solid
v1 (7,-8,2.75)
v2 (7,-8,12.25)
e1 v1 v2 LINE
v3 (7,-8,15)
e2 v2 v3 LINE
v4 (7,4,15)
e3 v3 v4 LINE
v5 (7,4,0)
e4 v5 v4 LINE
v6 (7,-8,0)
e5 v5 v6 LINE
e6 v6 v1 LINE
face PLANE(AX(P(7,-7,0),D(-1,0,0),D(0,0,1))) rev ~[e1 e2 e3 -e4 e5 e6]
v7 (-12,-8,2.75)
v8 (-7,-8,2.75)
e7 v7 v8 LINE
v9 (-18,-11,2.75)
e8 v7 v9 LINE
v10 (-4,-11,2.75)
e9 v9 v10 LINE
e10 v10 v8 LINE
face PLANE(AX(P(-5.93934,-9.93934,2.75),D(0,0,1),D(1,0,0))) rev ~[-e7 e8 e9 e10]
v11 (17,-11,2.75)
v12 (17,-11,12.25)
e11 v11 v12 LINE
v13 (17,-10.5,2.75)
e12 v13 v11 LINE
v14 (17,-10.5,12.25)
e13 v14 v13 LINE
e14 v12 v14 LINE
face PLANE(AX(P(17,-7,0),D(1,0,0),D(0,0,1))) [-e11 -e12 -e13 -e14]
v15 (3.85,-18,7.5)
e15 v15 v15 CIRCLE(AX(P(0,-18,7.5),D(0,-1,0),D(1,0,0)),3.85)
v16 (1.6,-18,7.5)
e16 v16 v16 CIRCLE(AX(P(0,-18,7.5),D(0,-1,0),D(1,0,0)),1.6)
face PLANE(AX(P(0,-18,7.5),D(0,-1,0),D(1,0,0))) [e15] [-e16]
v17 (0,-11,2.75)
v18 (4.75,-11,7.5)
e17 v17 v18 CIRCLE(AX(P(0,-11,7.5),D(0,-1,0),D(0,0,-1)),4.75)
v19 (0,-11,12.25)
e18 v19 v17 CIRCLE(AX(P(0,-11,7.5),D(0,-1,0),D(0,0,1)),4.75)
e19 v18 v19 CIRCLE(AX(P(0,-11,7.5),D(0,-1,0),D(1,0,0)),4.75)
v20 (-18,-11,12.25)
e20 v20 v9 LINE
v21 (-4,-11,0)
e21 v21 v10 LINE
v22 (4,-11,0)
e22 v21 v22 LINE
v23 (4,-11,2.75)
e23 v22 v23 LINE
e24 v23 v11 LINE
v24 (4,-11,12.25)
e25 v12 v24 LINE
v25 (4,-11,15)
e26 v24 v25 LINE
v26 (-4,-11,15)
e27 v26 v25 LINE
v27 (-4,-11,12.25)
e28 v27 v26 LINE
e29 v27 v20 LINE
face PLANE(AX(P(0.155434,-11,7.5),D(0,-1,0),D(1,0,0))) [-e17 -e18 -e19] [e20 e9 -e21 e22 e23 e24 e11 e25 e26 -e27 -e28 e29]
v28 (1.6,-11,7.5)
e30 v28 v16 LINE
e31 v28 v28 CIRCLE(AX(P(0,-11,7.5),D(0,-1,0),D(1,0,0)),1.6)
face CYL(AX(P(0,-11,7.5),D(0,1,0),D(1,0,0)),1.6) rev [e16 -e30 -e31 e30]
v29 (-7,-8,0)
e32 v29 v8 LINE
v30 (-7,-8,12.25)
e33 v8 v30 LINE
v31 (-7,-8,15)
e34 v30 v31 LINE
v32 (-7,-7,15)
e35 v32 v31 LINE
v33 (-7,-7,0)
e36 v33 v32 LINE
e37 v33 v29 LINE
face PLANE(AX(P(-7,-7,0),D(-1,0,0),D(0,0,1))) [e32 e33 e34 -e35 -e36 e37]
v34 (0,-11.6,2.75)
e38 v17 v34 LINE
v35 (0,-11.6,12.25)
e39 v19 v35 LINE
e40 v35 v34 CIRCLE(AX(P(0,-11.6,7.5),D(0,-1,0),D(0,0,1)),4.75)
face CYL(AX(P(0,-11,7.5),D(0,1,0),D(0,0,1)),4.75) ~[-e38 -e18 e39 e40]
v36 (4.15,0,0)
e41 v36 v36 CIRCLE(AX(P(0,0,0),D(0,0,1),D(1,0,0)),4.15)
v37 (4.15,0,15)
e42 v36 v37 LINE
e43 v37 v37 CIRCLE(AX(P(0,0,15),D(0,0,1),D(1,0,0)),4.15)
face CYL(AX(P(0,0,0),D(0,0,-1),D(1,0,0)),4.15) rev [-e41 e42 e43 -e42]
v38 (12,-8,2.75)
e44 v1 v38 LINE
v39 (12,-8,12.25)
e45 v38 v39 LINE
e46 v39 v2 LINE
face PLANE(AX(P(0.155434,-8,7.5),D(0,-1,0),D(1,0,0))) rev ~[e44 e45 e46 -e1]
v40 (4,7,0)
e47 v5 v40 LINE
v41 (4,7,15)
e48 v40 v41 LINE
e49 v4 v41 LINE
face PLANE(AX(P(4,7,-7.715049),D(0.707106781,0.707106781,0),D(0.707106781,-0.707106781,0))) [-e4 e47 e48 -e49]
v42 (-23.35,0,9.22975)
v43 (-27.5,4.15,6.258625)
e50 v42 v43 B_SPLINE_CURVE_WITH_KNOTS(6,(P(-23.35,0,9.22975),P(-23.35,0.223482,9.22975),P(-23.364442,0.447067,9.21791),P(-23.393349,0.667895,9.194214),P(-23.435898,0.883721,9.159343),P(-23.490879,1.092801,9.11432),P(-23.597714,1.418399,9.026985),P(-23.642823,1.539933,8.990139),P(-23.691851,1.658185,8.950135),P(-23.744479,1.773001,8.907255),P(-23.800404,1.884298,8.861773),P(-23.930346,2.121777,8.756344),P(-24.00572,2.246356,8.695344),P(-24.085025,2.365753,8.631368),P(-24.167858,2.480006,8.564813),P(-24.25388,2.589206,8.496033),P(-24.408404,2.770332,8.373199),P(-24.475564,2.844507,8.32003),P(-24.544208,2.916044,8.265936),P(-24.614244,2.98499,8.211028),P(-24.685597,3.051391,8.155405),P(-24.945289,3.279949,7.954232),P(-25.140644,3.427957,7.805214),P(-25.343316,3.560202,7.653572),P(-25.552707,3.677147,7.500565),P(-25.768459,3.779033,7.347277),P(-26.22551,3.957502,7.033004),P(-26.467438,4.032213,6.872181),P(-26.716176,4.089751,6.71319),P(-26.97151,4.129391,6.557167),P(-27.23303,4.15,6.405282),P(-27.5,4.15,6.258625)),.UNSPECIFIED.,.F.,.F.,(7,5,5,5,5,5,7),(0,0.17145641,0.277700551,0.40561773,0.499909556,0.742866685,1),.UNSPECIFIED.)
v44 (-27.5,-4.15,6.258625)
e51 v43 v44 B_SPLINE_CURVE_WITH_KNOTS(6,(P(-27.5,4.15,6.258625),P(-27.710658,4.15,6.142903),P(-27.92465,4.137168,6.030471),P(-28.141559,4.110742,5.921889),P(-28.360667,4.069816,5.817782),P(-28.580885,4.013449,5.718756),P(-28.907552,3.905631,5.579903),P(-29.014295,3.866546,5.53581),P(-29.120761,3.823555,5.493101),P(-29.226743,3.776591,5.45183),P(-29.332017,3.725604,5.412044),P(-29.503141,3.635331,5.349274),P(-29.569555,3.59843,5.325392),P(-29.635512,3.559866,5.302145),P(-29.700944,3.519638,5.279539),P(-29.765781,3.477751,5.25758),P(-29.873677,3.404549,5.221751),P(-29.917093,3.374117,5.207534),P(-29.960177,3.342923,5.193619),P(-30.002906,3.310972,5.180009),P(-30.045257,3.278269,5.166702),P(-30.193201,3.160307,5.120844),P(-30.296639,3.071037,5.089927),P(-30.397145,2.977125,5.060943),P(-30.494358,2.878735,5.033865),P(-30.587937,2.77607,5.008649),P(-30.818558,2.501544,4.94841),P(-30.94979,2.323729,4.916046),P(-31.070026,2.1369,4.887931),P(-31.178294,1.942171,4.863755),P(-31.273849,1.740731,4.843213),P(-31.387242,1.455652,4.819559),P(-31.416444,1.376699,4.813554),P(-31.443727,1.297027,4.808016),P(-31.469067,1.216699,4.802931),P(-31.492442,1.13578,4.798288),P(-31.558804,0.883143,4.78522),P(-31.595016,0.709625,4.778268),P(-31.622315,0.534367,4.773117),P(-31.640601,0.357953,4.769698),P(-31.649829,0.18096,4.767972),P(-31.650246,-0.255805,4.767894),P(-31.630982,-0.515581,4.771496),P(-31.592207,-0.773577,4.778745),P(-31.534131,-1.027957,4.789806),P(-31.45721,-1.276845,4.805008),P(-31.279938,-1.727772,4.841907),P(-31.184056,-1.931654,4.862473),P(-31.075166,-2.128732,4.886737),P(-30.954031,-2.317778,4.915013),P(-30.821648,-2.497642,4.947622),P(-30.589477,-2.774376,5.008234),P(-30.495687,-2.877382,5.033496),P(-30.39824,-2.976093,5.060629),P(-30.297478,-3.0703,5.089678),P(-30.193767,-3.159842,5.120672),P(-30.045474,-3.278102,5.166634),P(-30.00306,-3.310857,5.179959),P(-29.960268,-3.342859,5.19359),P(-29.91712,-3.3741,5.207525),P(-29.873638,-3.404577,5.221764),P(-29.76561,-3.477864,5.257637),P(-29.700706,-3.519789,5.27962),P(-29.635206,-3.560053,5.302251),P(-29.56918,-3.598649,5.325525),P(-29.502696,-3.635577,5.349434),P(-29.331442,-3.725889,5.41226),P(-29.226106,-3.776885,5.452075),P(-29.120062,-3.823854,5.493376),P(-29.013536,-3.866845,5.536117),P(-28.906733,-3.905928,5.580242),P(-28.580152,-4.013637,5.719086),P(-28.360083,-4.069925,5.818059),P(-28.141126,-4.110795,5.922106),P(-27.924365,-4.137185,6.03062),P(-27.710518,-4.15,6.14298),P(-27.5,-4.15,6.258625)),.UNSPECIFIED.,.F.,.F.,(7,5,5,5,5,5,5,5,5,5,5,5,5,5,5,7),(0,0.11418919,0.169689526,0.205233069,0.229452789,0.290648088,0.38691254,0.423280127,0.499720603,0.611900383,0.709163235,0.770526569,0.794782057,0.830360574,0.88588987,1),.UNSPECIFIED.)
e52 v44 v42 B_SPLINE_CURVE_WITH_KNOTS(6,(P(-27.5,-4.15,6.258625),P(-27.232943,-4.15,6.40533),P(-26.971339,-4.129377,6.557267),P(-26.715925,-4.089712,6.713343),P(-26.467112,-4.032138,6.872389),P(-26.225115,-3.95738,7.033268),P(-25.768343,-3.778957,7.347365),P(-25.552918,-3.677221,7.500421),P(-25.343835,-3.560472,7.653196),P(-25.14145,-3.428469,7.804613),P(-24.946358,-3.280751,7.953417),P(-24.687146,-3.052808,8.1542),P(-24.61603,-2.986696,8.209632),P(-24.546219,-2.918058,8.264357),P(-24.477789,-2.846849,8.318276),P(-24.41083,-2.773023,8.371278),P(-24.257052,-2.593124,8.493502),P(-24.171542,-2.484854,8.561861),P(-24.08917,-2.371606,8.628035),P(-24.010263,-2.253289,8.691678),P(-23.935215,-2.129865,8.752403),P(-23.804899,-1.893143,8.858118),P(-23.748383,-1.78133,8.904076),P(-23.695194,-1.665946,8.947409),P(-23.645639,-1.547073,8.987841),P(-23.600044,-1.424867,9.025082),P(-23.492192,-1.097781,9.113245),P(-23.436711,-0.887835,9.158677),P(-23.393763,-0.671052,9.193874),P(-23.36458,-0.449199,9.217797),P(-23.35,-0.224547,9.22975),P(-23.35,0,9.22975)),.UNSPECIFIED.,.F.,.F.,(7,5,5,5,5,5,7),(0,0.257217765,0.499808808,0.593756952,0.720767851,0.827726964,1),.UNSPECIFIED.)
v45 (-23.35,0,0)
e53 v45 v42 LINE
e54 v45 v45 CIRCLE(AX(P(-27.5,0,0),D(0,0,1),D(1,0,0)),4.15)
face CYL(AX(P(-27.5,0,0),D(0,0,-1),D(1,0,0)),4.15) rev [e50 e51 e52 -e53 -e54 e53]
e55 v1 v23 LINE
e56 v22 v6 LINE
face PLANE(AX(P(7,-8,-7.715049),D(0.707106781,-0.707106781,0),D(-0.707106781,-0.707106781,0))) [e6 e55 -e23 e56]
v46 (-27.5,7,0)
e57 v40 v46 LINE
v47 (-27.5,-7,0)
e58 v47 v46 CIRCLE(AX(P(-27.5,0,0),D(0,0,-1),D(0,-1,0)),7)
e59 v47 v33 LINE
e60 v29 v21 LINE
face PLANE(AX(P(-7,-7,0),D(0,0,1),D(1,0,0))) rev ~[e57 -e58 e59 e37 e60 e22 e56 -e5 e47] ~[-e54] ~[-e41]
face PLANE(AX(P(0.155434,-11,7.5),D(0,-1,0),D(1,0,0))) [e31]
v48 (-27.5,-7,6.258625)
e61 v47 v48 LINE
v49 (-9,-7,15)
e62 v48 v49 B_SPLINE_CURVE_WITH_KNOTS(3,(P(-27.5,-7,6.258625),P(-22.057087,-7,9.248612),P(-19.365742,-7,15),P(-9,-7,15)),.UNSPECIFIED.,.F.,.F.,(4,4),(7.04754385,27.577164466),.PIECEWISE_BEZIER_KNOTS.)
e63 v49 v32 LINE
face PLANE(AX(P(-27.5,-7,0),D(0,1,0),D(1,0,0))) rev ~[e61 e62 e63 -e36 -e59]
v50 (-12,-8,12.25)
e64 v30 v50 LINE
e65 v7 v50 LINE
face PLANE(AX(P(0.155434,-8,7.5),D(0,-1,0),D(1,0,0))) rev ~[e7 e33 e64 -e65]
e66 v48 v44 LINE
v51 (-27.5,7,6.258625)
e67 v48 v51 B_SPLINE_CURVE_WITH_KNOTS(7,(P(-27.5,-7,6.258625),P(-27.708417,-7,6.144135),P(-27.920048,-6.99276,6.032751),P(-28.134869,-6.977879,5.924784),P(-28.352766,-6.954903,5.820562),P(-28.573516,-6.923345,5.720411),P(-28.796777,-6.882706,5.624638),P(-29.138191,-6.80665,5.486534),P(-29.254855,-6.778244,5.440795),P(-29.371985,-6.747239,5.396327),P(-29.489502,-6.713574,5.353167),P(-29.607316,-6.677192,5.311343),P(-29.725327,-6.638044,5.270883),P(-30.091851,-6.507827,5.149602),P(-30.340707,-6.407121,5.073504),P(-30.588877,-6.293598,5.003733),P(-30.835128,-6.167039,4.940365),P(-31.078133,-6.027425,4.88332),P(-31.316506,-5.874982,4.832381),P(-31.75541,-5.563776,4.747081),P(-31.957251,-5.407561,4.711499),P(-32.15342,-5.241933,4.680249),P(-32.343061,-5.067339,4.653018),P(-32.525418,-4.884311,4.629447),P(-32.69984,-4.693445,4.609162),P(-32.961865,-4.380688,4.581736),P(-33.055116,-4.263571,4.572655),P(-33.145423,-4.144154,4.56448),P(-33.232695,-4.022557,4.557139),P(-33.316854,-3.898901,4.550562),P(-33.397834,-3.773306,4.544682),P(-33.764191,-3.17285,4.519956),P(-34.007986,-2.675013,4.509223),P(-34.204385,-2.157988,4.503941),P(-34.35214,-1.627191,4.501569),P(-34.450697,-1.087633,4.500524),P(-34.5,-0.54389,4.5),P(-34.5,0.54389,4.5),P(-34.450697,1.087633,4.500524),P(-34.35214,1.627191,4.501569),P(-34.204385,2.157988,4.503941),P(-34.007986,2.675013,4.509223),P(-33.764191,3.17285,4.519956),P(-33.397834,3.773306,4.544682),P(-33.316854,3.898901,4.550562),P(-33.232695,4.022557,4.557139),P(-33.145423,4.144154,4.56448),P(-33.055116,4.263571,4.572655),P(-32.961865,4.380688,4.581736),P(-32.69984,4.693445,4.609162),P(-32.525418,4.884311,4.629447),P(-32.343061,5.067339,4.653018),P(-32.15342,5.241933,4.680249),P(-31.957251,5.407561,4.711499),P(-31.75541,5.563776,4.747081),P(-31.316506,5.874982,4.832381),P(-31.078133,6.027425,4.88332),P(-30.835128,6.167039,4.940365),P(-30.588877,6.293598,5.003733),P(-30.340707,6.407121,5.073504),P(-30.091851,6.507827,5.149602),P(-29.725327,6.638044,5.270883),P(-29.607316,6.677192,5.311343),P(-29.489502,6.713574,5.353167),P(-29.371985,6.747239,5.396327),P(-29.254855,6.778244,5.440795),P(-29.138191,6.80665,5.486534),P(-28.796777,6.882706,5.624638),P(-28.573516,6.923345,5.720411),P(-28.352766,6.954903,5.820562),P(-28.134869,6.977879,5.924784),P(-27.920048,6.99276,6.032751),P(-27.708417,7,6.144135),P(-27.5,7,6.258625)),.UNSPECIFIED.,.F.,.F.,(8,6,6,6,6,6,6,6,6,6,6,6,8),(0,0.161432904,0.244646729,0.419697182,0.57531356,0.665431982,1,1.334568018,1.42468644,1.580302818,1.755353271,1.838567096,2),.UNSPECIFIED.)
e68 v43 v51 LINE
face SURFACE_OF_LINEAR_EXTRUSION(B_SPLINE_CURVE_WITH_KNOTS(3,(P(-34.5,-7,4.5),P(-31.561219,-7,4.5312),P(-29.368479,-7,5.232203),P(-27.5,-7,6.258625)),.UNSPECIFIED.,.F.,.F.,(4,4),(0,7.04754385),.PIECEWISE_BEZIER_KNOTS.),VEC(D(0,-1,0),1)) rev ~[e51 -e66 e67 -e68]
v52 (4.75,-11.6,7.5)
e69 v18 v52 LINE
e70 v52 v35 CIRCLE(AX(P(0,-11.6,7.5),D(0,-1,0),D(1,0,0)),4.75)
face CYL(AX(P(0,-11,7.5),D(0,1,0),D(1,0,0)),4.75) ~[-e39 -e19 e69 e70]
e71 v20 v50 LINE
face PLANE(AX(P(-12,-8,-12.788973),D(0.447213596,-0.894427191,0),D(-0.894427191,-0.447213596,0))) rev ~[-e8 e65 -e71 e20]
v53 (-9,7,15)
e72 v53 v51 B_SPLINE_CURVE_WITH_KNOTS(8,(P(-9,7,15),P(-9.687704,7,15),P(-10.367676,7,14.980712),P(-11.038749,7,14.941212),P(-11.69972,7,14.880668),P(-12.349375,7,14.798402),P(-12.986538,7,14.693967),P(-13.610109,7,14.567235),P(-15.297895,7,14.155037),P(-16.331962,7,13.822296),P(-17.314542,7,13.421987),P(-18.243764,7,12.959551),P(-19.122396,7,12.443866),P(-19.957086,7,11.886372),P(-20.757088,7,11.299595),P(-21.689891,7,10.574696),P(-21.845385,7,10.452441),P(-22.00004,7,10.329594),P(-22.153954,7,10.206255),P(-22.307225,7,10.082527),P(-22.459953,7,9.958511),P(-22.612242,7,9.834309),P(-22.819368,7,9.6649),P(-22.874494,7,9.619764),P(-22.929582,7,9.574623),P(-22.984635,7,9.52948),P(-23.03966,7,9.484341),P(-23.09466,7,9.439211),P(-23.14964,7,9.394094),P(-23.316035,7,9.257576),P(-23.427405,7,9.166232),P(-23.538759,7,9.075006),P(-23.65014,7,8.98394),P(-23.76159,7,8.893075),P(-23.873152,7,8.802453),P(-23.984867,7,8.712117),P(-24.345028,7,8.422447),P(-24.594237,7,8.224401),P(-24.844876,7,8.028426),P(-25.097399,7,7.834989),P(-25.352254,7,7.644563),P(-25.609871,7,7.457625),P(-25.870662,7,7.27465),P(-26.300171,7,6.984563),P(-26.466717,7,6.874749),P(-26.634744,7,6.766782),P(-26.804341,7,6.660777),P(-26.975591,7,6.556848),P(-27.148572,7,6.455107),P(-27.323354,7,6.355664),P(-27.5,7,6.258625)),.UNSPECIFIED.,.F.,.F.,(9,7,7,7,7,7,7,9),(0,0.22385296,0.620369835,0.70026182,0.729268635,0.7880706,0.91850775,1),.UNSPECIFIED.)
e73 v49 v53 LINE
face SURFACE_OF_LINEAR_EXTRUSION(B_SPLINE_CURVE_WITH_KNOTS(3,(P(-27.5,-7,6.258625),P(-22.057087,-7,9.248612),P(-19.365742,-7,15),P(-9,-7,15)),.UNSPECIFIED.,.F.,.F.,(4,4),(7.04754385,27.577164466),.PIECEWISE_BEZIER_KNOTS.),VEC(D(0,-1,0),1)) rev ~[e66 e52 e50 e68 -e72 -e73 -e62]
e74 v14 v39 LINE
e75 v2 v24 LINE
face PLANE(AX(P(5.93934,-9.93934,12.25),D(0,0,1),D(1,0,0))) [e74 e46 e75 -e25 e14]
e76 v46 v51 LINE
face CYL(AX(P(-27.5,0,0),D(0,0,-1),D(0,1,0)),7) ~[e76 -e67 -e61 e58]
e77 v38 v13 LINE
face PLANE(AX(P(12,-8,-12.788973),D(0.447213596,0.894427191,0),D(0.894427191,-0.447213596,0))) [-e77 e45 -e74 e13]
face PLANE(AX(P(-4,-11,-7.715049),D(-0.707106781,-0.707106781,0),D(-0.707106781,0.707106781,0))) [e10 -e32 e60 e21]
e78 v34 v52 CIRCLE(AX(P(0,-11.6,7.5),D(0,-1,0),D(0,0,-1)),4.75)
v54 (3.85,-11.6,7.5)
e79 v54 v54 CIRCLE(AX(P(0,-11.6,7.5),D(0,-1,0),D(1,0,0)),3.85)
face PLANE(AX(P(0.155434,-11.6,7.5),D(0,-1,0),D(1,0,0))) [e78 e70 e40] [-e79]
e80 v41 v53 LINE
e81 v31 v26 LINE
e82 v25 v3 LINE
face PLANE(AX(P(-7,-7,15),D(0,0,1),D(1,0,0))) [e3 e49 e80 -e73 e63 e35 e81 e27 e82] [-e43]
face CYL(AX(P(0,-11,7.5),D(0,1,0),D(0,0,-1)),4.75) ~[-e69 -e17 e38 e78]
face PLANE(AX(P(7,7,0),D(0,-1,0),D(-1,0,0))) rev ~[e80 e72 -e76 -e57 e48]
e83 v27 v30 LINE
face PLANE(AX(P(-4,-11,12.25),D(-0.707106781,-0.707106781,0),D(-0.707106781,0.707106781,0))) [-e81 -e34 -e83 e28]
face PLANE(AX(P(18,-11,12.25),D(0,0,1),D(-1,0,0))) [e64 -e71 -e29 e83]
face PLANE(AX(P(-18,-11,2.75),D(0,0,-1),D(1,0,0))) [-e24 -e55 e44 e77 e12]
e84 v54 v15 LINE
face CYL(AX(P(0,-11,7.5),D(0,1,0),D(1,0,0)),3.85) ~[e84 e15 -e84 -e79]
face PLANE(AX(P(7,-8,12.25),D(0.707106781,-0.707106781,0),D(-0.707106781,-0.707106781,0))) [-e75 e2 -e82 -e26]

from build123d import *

# Parameters (mm, degrees)
F0_R         = 4.15
F1_DEPTH     = 15
F2_W         = 14
F2_H         = 15
F3_DEPTH     = 4
F4_R         = 3.85
F5_DEPTH     = 3
F6_T1_DEPTH  = 40.5779464854
F4_R_2       = 1.6
F7_DEPTH     = 7
F8_DEPTH     = 0.6
F10_DEPTH    = 25
F11_T1_DEPTH = 30.4300979278
F11_T3_DEPTH = 10.4650489639
F11_T5_DEPTH = 10.4650489639


# Not quite as in the source:
# - a fillet or chamfer that OpenCascade refuses, or shapes differently, is made with other operations: its cross-section is extruded or revolved along the edge and cut away or added


with BuildPart() as f1:
    # F0 (on Top) → F1 (new body)
    with BuildSketch(Plane.XY):
        with BuildLine():
            Line((7, 7), (-27.5, 7))
            ThreePointArc((-27.5, 7), (-34.5, 0), (-27.5, -7))
            Line((-27.5, -7), (7, -7))
            Line((7, -7), (7, 7))
        make_face()
        with Locations((-27.5, 0)):
            Circle(F0_R, mode=Mode.SUBTRACT)
        Circle(F0_R, mode=Mode.SUBTRACT)
    extrude(amount=F1_DEPTH)

    # F2 (on face) → F3 (join)
    with BuildSketch(Plane.XZ.offset(7)):
        with Locations((0, 7.5)):
            Rectangle(F2_W, F2_H)
    extrude(amount=F3_DEPTH)

    # F4 (on face) → F5 (join)
    with BuildSketch(Plane.XZ.offset(11)):
        with BuildLine():
            ThreePointArc((0, 2.75), (3.3587572106, 4.1412427894), (4.75, 7.5))
            ThreePointArc((4.75, 7.5), (3.3587572106, 10.8587572106), (0, 12.25))
            ThreePointArc((0, 12.25), (-4.75, 7.5), (0, 2.75))
        make_face()
        with Locations((0, 7.5)):
            Circle(F4_R, mode=Mode.SUBTRACT)
        with BuildLine():
            ThreePointArc((0, 12.25), (3.3587572106, 10.8587572106), (4.75, 7.5))
            ThreePointArc((4.75, 7.5), (3.3587572106, 4.1412427894), (0, 2.75))
            Line((0, 2.75), (18, 2.75))
            Line((18, 2.75), (18, 12.25))
            Line((18, 12.25), (0, 12.25))
        make_face()
        with BuildLine():
            ThreePointArc((0, 2.75), (-4.75, 7.5), (0, 12.25))
            Line((0, 12.25), (-18, 12.25))
            Line((-18, 12.25), (-18, 2.75))
            Line((-18, 2.75), (0, 2.75))
        make_face()
    extrude(amount=-F5_DEPTH)

    # F6: chamfer of 3 x 6 on 2 edges, made by hand

    # F6_s2 → F6_t1 (cut)
    with BuildSketch(Plane.XY.offset(-12.7889732427)):
        Polygon((-12, -8), (-18, -11), (-18, -8), align=None)
        Polygon((12, -8), (18, -11), (18, -8), align=None)
    extrude(amount=F6_T1_DEPTH, mode=Mode.SUBTRACT)

    # F4 (on face) → F7 (join)
    with BuildSketch(Plane.XZ.offset(11)):
        with Locations((0, 7.5)):
            Circle(F4_R)
        with Locations((0, 7.5)):
            Circle(F4_R_2, mode=Mode.SUBTRACT)
    extrude(amount=F7_DEPTH)

    # F4 (on face) → F8 (join)
    with BuildSketch(Plane.XZ.offset(11)):
        with BuildLine():
            ThreePointArc((0, 2.75), (3.3587572106, 4.1412427894), (4.75, 7.5))
            ThreePointArc((4.75, 7.5), (3.3587572106, 10.8587572106), (0, 12.25))
            ThreePointArc((0, 12.25), (-4.75, 7.5), (0, 2.75))
        make_face()
        with Locations((0, 7.5)):
            Circle(F4_R, mode=Mode.SUBTRACT)
    extrude(amount=F8_DEPTH)

    # F9 (on face) → F10 (intersect, symmetric)
    with BuildSketch(Plane.XZ.offset(7)):
        with BuildLine():
            Line((-27.5, 6.2586253838), (-27.5, 0))
            Line((-27.5, 0), (-7, 0))
            Line((-7, 0), (-7, 15))
            Line((-7, 15), (-9, 15))
            add(Edge.make_bspline(
                [(-27.5, 6.2586253838), (-22.0570868036, 9.2486118384), (-19.3657420182, 15), (-9, 15)],
                knots=[7.0475438496, 7.0475438496, 7.0475438496, 7.0475438496, 27.5771644663, 27.5771644663, 27.5771644663, 27.5771644663], degree=3))
        make_face()
        with BuildLine():
            Line((-34.5, 4.5), (-34.5, 0))
            Line((-34.5, 0), (-27.5, 0))
            Line((-27.5, 0), (-27.5, 6.2586253838))
            add(Edge.make_bspline(
                [(-34.5, 4.5), (-31.5612189253, 4.5312000669), (-29.3684792153, 5.2322030722), (-27.5, 6.2586253838)],
                knots=[0, 0, 0, 0, 7.0475438496, 7.0475438496, 7.0475438496, 7.0475438496], degree=3))
        make_face()
        Polygon((-7, 15), (-7, 0), (0, 0), (17, 0), (17, 15), align=None)
    extrude(amount=F10_DEPTH, both=True, mode=Mode.INTERSECT)

    # F11: chamfer of 3 on 6 edges, made by hand

    # F11_s2 → F11_t1 (cut)
    with BuildSketch(Plane.XY.offset(-7.7150489639)):
        Polygon((4, 7), (7, 4), (7, 7), align=None)
    extrude(amount=F11_T1_DEPTH, mode=Mode.SUBTRACT)

    # F11_s4 → F11_t3 (cut)
    with BuildSketch(Plane.XY.offset(12.25)):
        Polygon((-4, -11), (-7, -8), (-7, -11), align=None)
        Polygon((7, -8), (4, -11), (7, -11), align=None)
    extrude(amount=F11_T3_DEPTH, mode=Mode.SUBTRACT)

    # F11_s6 → F11_t5 (cut)
    with BuildSketch(Plane.XY.offset(-7.7150489639)):
        Polygon((-4, -11), (-7, -8), (-7, -11), align=None)
        Polygon((7, -8), (4, -11), (7, -11), align=None)
    extrude(amount=F11_T5_DEPTH, mode=Mode.SUBTRACT)


solid = f1.part
